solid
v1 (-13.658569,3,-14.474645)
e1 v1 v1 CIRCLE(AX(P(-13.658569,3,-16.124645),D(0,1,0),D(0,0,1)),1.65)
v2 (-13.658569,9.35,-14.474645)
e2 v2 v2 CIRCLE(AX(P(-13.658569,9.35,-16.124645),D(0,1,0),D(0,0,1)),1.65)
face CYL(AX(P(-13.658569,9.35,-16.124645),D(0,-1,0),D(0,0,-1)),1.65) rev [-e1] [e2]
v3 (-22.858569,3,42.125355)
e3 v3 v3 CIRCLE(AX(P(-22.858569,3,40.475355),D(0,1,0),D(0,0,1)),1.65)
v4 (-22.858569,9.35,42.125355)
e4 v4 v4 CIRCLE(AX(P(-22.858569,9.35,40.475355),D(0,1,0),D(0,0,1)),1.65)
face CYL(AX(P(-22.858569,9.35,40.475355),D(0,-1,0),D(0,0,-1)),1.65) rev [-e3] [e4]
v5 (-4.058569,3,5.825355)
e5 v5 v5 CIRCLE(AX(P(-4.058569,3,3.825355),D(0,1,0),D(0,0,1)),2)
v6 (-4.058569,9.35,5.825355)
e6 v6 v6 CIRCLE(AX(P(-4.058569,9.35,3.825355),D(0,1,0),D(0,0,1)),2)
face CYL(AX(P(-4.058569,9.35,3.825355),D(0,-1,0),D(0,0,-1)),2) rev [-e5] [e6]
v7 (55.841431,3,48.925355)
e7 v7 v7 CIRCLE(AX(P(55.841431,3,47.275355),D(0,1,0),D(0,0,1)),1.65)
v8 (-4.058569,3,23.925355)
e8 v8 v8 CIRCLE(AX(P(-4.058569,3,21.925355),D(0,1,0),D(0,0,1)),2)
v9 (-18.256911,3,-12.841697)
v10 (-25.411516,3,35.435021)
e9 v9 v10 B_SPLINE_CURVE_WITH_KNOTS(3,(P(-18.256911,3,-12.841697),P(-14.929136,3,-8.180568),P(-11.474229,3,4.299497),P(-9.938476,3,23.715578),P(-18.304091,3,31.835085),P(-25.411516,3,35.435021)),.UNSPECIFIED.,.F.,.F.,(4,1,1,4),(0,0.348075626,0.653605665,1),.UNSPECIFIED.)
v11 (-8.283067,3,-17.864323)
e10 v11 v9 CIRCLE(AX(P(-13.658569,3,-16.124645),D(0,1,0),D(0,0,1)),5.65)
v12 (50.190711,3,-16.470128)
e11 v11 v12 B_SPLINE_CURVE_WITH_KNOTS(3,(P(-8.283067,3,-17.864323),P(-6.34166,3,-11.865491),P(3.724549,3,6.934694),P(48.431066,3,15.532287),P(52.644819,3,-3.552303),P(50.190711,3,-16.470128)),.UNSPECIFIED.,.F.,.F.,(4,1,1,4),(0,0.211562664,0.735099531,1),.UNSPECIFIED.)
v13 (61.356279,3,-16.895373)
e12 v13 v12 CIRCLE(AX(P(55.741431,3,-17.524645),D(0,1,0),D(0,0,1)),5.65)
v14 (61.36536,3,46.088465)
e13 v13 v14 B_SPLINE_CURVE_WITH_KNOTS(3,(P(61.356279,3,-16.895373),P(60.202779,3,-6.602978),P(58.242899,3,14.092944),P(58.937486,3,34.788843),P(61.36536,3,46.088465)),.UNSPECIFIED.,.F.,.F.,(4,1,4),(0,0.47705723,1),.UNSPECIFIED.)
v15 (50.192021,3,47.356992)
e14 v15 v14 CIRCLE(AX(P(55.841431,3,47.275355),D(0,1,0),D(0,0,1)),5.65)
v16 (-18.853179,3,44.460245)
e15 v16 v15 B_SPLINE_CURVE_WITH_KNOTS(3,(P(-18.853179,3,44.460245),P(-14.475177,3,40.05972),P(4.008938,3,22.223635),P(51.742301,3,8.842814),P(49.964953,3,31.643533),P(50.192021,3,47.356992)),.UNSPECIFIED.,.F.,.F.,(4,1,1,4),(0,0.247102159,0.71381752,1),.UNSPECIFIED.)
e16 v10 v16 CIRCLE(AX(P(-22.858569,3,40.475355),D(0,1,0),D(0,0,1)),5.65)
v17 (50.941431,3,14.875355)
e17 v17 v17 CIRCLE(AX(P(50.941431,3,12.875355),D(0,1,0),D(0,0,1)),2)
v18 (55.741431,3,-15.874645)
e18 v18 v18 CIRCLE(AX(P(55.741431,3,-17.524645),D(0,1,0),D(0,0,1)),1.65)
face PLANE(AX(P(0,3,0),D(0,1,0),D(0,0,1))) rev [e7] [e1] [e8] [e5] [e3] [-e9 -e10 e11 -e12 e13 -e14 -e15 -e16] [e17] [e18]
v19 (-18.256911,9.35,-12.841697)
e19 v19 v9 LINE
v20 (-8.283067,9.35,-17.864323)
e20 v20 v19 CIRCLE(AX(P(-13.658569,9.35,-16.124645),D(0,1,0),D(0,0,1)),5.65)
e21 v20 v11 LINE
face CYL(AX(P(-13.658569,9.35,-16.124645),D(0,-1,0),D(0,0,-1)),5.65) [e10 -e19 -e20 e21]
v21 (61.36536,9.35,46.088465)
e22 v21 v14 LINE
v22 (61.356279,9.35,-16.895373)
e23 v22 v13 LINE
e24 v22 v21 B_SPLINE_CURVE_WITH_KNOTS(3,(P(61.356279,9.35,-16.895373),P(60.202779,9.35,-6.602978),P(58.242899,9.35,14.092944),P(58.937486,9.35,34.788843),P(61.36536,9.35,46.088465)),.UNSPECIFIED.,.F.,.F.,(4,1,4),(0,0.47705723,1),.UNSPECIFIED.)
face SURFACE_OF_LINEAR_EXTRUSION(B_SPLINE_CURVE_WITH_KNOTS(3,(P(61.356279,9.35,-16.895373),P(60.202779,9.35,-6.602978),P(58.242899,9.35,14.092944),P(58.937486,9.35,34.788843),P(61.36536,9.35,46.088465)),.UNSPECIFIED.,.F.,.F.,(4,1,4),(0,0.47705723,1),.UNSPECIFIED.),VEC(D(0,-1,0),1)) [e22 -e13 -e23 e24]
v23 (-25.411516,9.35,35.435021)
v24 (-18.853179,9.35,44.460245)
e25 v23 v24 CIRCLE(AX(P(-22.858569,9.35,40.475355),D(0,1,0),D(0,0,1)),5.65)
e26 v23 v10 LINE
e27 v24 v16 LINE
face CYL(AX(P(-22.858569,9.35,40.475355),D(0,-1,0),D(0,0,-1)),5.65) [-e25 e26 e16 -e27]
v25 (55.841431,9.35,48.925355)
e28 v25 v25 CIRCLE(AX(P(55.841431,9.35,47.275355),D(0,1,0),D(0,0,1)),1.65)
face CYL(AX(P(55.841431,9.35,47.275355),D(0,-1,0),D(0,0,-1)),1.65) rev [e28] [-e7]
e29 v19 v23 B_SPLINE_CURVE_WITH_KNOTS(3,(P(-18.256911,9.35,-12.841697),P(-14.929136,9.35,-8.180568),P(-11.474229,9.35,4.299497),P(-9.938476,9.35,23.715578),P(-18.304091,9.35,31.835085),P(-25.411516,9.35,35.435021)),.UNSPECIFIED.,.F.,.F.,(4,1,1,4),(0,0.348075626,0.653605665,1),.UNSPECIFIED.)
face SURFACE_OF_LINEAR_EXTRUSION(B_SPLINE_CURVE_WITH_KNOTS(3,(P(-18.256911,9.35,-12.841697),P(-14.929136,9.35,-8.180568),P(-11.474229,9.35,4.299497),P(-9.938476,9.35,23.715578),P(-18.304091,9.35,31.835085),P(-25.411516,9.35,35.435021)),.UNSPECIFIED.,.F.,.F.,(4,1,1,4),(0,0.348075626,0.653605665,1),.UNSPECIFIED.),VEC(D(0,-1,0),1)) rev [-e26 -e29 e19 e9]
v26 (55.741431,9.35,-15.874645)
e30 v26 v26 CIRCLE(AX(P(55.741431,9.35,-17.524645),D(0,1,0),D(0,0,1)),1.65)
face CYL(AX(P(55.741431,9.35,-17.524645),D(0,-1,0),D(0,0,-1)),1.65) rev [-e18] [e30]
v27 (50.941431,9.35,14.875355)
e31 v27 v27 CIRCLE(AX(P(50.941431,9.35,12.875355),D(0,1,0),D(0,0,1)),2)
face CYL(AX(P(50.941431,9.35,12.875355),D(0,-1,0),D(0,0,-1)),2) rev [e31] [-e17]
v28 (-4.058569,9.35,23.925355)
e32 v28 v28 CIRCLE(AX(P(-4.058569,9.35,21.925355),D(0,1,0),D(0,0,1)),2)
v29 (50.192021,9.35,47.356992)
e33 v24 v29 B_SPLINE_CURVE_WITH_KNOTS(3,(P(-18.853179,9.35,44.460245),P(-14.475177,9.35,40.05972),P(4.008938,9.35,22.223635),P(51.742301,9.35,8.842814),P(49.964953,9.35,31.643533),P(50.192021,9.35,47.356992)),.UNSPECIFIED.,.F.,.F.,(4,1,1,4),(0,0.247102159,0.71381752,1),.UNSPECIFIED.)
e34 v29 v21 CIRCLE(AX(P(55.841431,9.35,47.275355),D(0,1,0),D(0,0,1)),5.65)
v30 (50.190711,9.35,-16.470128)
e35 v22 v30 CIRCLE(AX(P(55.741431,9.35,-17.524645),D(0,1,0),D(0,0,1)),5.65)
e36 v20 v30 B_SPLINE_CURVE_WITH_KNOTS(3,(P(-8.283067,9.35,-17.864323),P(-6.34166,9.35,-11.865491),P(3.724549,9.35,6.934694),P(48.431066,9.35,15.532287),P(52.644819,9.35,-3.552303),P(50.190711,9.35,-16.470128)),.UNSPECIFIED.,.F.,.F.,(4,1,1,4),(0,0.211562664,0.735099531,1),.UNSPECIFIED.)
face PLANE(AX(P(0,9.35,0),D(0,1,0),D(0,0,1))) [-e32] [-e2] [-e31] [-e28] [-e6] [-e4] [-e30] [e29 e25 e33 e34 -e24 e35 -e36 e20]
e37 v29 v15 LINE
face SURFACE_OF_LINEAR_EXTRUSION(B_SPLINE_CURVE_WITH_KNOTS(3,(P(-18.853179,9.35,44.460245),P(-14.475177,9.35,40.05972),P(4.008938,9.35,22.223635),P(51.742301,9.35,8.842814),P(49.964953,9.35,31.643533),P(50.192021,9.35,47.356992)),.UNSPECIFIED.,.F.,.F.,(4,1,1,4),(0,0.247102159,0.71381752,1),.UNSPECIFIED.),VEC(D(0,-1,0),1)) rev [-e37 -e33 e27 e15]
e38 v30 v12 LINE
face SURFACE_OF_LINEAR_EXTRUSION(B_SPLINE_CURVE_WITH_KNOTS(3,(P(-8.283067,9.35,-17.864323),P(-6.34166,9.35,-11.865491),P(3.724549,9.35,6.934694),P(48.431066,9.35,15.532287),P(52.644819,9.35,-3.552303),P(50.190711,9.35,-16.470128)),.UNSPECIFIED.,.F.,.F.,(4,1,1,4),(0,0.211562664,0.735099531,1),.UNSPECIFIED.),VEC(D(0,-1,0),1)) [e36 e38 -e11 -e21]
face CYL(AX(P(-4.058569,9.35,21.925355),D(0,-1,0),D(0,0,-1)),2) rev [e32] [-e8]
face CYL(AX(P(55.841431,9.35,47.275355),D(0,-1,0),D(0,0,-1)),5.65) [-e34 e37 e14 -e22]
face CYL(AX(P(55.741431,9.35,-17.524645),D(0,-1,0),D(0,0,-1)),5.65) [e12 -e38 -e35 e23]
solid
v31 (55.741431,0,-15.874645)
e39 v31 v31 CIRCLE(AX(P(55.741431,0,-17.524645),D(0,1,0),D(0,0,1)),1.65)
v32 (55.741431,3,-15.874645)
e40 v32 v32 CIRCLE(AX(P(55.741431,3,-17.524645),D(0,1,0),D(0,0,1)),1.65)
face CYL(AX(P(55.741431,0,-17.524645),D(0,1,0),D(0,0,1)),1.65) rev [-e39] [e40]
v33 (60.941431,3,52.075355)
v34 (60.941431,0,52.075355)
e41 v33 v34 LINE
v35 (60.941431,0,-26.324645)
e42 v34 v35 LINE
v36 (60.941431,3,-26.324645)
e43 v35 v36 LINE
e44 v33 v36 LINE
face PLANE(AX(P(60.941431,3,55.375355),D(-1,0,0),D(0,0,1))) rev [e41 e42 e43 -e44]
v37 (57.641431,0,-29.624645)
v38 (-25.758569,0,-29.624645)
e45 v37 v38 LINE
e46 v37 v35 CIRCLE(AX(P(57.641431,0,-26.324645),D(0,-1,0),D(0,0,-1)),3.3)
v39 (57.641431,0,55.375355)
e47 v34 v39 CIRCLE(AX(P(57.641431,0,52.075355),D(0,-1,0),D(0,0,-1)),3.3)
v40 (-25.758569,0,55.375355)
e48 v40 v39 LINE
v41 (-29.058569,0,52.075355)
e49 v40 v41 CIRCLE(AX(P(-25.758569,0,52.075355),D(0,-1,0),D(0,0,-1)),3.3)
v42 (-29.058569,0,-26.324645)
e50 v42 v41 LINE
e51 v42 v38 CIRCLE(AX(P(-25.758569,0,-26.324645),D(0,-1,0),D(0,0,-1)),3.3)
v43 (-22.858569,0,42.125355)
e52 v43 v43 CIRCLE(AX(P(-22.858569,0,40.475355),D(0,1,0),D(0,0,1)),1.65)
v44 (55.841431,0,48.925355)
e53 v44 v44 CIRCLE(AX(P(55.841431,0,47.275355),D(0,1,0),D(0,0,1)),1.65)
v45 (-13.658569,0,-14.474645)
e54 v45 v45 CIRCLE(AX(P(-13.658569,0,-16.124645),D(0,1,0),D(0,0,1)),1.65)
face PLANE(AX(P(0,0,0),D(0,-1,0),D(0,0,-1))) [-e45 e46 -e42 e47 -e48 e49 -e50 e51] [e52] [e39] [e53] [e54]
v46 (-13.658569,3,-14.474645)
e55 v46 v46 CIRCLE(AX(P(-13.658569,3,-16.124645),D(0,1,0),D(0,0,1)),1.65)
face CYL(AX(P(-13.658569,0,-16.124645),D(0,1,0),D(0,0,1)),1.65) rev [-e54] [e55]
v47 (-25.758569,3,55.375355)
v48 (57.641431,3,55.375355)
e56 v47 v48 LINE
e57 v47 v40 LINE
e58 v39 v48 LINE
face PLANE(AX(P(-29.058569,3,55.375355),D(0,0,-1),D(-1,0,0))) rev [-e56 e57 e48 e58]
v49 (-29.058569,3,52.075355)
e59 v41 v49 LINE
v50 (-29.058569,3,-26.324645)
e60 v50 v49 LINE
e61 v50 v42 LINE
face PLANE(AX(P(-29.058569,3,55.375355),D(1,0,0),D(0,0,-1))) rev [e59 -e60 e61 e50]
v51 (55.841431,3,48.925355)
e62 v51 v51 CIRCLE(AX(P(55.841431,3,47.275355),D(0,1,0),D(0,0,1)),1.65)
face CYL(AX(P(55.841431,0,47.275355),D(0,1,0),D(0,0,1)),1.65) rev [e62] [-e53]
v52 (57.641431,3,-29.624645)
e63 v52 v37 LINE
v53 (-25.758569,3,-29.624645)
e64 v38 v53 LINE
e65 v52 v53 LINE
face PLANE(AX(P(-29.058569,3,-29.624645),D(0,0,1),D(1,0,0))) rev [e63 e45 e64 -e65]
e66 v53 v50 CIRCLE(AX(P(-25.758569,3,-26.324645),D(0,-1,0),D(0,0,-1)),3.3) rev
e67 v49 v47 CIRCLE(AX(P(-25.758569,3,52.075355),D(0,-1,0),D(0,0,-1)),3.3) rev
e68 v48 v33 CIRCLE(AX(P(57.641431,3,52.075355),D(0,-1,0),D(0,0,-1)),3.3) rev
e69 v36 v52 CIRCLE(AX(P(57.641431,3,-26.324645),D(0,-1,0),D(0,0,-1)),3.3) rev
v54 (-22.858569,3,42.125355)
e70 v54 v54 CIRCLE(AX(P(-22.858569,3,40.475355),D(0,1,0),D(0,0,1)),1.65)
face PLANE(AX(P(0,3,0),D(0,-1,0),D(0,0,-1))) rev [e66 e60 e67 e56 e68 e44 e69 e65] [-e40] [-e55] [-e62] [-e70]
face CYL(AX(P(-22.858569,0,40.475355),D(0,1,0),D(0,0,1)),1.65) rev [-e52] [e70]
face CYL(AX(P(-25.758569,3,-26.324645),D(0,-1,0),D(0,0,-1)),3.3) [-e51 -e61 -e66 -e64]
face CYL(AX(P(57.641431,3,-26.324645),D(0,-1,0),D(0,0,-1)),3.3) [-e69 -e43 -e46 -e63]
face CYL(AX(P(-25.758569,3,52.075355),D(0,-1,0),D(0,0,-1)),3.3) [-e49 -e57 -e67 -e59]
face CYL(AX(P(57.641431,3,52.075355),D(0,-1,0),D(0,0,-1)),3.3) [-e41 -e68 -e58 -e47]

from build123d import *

# Parameters (mm, degrees)
SKETCH1_W           = 90
SKETCH1_H           = 85
BOSS_EXTRUDE1_DEPTH = 3
SKETCH4_R           = 1.65
SKETCH4_R_2         = 2
BOSS_EXTRUDE2_DEPTH = 6.35
SKETCH4_3_R         = 1.65
CUT_EXTRUDE1_DEPTH  = 83.993665433
FILLET1_R           = 3.3


with BuildPart() as part:
    # Sketch1 → Boss-Extrude1 (new body)
    with BuildSketch(Plane(origin=(0, 0, 0), x_dir=(1, 0, 0), z_dir=(0, 1, 0))):
        with Locations((15.941430843, -12.87535482)):
            Rectangle(SKETCH1_W, SKETCH1_H)
    extrude(amount=BOSS_EXTRUDE1_DEPTH)

    # Sketch4<3> → Cut-Extrude1 (cut, through all)
    with BuildSketch(Plane(origin=(0, 3, 0), x_dir=(1, 0, 0), z_dir=(0, 1, 0))):
        with Locations((-13.658569157, 16.12464518)):
            Circle(SKETCH4_3_R)
        with Locations((55.741430843, 17.52464518)):
            Circle(SKETCH4_3_R)
        with Locations((-22.858569157, -40.47535482)):
            Circle(SKETCH4_3_R)
        with Locations((55.841430843, -47.27535482)):
            Circle(SKETCH4_3_R)
    extrude(amount=-CUT_EXTRUDE1_DEPTH, mode=Mode.SUBTRACT)

    # Fillet1
    fillet1_edges = [part.edges().sort_by_distance(p)[0] for p in [
        (-29.058569157, 1.5, 55.37535482),
        (60.941430843, 1.5, 55.37535482),
        (60.941430843, 1.5, -29.62464518),
        (-29.058569157, 1.5, -29.62464518),
    ]]
    fillet(fillet1_edges, radius=FILLET1_R)


with BuildPart() as body_2:
    # Sketch4 → Boss-Extrude2 (new body)
    with BuildSketch(Plane(origin=(0, 3, 0), x_dir=(1, 0, 0), z_dir=(0, 1, 0))):
        with BuildLine():
            ThreePointArc((-8.283067345, 17.864323387), (-16.199767479, 21.170912225), (-18.256911207, 12.84169675))
            add(Edge.make_bspline(
                [(-18.256911207, 12.84169675), (-14.92913649, 8.180567665), (-11.474229497, -4.299496978), (-9.93847644, -23.715578027), (-18.304090766, -31.835085279), (-25.411515924, -35.435021219)],
                knots=[0, 0, 0, 0, 0.348075626, 0.653605665, 1, 1, 1, 1], degree=3))
            ThreePointArc((-25.411515924, -35.435021219), (-27.429243311, -43.796715653), (-18.853178535, -44.460244525))
            add(Edge.make_bspline(
                [(-18.853178535, -44.460244525), (-14.475177411, -40.059720058), (4.008938201, -22.223634722), (51.742301245, -8.842814223), (49.964952893, -31.64353292), (50.19202066, -47.356991777)],
                knots=[0, 0, 0, 0, 0.247102159, 0.71381752, 1.000000001, 1.000000001, 1.000000001, 1.000000001], degree=3))
            ThreePointArc((50.19202066, -47.356991777), (56.478789612, -52.889290498), (61.365360002, -46.088465341))
            add(Edge.make_bspline(
                [(61.365360002, -46.088465341), (58.937486206, -34.788843016), (58.574256962, -23.966071998), (58.936942589, -13.143294965), (59.267804417, -3.270160996), (60.202779447, 6.602977947), (61.356278652, 16.895372523)],
                knots=[0.967910845, 0.967910845, 0.967910845, 0.967910845, 1.490853614, 1.490853616, 1.490853616, 1.967910881, 1.967910881, 1.967910881, 1.967910881], degree=3))
            ThreePointArc((61.356278652, 16.895372523), (55.526404465, 23.170551986), (50.190710775, 16.470127882))
            add(Edge.make_bspline(
                [(50.190710775, 16.470127882), (52.644819358, 3.552303028), (51.229075419, -2.859768981), (36.588288176, -13.25478094), (3.724548889, -6.934694412), (-6.34166017, 11.865491104), (-8.283067345, 17.864323387)],
                knots=[0.735099529, 0.735099529, 0.735099529, 0.735099529, 0.999999998, 1, 1.523536868, 1.735099533, 1.735099533, 1.735099533, 1.735099533], degree=3))
        make_face()
        with Locations((-13.658569157, 16.12464518)):
            Circle(SKETCH4_R, mode=Mode.SUBTRACT)
        with Locations((-4.058569157, -3.82535482)):
            Circle(SKETCH4_R_2, mode=Mode.SUBTRACT)
        with Locations((50.941430843, -12.87535482)):
            Circle(SKETCH4_R_2, mode=Mode.SUBTRACT)
        with Locations((-4.058569157, -21.92535482)):
            Circle(SKETCH4_R_2, mode=Mode.SUBTRACT)
        with Locations((55.741430843, 17.52464518)):
            Circle(SKETCH4_R, mode=Mode.SUBTRACT)
        with Locations((55.841430843, -47.27535482)):
            Circle(SKETCH4_R, mode=Mode.SUBTRACT)
        with Locations((-22.858569157, -40.47535482)):
            Circle(SKETCH4_R, mode=Mode.SUBTRACT)
    extrude(amount=BOSS_EXTRUDE2_DEPTH)


solid = Compound([part.part, body_2.part])
